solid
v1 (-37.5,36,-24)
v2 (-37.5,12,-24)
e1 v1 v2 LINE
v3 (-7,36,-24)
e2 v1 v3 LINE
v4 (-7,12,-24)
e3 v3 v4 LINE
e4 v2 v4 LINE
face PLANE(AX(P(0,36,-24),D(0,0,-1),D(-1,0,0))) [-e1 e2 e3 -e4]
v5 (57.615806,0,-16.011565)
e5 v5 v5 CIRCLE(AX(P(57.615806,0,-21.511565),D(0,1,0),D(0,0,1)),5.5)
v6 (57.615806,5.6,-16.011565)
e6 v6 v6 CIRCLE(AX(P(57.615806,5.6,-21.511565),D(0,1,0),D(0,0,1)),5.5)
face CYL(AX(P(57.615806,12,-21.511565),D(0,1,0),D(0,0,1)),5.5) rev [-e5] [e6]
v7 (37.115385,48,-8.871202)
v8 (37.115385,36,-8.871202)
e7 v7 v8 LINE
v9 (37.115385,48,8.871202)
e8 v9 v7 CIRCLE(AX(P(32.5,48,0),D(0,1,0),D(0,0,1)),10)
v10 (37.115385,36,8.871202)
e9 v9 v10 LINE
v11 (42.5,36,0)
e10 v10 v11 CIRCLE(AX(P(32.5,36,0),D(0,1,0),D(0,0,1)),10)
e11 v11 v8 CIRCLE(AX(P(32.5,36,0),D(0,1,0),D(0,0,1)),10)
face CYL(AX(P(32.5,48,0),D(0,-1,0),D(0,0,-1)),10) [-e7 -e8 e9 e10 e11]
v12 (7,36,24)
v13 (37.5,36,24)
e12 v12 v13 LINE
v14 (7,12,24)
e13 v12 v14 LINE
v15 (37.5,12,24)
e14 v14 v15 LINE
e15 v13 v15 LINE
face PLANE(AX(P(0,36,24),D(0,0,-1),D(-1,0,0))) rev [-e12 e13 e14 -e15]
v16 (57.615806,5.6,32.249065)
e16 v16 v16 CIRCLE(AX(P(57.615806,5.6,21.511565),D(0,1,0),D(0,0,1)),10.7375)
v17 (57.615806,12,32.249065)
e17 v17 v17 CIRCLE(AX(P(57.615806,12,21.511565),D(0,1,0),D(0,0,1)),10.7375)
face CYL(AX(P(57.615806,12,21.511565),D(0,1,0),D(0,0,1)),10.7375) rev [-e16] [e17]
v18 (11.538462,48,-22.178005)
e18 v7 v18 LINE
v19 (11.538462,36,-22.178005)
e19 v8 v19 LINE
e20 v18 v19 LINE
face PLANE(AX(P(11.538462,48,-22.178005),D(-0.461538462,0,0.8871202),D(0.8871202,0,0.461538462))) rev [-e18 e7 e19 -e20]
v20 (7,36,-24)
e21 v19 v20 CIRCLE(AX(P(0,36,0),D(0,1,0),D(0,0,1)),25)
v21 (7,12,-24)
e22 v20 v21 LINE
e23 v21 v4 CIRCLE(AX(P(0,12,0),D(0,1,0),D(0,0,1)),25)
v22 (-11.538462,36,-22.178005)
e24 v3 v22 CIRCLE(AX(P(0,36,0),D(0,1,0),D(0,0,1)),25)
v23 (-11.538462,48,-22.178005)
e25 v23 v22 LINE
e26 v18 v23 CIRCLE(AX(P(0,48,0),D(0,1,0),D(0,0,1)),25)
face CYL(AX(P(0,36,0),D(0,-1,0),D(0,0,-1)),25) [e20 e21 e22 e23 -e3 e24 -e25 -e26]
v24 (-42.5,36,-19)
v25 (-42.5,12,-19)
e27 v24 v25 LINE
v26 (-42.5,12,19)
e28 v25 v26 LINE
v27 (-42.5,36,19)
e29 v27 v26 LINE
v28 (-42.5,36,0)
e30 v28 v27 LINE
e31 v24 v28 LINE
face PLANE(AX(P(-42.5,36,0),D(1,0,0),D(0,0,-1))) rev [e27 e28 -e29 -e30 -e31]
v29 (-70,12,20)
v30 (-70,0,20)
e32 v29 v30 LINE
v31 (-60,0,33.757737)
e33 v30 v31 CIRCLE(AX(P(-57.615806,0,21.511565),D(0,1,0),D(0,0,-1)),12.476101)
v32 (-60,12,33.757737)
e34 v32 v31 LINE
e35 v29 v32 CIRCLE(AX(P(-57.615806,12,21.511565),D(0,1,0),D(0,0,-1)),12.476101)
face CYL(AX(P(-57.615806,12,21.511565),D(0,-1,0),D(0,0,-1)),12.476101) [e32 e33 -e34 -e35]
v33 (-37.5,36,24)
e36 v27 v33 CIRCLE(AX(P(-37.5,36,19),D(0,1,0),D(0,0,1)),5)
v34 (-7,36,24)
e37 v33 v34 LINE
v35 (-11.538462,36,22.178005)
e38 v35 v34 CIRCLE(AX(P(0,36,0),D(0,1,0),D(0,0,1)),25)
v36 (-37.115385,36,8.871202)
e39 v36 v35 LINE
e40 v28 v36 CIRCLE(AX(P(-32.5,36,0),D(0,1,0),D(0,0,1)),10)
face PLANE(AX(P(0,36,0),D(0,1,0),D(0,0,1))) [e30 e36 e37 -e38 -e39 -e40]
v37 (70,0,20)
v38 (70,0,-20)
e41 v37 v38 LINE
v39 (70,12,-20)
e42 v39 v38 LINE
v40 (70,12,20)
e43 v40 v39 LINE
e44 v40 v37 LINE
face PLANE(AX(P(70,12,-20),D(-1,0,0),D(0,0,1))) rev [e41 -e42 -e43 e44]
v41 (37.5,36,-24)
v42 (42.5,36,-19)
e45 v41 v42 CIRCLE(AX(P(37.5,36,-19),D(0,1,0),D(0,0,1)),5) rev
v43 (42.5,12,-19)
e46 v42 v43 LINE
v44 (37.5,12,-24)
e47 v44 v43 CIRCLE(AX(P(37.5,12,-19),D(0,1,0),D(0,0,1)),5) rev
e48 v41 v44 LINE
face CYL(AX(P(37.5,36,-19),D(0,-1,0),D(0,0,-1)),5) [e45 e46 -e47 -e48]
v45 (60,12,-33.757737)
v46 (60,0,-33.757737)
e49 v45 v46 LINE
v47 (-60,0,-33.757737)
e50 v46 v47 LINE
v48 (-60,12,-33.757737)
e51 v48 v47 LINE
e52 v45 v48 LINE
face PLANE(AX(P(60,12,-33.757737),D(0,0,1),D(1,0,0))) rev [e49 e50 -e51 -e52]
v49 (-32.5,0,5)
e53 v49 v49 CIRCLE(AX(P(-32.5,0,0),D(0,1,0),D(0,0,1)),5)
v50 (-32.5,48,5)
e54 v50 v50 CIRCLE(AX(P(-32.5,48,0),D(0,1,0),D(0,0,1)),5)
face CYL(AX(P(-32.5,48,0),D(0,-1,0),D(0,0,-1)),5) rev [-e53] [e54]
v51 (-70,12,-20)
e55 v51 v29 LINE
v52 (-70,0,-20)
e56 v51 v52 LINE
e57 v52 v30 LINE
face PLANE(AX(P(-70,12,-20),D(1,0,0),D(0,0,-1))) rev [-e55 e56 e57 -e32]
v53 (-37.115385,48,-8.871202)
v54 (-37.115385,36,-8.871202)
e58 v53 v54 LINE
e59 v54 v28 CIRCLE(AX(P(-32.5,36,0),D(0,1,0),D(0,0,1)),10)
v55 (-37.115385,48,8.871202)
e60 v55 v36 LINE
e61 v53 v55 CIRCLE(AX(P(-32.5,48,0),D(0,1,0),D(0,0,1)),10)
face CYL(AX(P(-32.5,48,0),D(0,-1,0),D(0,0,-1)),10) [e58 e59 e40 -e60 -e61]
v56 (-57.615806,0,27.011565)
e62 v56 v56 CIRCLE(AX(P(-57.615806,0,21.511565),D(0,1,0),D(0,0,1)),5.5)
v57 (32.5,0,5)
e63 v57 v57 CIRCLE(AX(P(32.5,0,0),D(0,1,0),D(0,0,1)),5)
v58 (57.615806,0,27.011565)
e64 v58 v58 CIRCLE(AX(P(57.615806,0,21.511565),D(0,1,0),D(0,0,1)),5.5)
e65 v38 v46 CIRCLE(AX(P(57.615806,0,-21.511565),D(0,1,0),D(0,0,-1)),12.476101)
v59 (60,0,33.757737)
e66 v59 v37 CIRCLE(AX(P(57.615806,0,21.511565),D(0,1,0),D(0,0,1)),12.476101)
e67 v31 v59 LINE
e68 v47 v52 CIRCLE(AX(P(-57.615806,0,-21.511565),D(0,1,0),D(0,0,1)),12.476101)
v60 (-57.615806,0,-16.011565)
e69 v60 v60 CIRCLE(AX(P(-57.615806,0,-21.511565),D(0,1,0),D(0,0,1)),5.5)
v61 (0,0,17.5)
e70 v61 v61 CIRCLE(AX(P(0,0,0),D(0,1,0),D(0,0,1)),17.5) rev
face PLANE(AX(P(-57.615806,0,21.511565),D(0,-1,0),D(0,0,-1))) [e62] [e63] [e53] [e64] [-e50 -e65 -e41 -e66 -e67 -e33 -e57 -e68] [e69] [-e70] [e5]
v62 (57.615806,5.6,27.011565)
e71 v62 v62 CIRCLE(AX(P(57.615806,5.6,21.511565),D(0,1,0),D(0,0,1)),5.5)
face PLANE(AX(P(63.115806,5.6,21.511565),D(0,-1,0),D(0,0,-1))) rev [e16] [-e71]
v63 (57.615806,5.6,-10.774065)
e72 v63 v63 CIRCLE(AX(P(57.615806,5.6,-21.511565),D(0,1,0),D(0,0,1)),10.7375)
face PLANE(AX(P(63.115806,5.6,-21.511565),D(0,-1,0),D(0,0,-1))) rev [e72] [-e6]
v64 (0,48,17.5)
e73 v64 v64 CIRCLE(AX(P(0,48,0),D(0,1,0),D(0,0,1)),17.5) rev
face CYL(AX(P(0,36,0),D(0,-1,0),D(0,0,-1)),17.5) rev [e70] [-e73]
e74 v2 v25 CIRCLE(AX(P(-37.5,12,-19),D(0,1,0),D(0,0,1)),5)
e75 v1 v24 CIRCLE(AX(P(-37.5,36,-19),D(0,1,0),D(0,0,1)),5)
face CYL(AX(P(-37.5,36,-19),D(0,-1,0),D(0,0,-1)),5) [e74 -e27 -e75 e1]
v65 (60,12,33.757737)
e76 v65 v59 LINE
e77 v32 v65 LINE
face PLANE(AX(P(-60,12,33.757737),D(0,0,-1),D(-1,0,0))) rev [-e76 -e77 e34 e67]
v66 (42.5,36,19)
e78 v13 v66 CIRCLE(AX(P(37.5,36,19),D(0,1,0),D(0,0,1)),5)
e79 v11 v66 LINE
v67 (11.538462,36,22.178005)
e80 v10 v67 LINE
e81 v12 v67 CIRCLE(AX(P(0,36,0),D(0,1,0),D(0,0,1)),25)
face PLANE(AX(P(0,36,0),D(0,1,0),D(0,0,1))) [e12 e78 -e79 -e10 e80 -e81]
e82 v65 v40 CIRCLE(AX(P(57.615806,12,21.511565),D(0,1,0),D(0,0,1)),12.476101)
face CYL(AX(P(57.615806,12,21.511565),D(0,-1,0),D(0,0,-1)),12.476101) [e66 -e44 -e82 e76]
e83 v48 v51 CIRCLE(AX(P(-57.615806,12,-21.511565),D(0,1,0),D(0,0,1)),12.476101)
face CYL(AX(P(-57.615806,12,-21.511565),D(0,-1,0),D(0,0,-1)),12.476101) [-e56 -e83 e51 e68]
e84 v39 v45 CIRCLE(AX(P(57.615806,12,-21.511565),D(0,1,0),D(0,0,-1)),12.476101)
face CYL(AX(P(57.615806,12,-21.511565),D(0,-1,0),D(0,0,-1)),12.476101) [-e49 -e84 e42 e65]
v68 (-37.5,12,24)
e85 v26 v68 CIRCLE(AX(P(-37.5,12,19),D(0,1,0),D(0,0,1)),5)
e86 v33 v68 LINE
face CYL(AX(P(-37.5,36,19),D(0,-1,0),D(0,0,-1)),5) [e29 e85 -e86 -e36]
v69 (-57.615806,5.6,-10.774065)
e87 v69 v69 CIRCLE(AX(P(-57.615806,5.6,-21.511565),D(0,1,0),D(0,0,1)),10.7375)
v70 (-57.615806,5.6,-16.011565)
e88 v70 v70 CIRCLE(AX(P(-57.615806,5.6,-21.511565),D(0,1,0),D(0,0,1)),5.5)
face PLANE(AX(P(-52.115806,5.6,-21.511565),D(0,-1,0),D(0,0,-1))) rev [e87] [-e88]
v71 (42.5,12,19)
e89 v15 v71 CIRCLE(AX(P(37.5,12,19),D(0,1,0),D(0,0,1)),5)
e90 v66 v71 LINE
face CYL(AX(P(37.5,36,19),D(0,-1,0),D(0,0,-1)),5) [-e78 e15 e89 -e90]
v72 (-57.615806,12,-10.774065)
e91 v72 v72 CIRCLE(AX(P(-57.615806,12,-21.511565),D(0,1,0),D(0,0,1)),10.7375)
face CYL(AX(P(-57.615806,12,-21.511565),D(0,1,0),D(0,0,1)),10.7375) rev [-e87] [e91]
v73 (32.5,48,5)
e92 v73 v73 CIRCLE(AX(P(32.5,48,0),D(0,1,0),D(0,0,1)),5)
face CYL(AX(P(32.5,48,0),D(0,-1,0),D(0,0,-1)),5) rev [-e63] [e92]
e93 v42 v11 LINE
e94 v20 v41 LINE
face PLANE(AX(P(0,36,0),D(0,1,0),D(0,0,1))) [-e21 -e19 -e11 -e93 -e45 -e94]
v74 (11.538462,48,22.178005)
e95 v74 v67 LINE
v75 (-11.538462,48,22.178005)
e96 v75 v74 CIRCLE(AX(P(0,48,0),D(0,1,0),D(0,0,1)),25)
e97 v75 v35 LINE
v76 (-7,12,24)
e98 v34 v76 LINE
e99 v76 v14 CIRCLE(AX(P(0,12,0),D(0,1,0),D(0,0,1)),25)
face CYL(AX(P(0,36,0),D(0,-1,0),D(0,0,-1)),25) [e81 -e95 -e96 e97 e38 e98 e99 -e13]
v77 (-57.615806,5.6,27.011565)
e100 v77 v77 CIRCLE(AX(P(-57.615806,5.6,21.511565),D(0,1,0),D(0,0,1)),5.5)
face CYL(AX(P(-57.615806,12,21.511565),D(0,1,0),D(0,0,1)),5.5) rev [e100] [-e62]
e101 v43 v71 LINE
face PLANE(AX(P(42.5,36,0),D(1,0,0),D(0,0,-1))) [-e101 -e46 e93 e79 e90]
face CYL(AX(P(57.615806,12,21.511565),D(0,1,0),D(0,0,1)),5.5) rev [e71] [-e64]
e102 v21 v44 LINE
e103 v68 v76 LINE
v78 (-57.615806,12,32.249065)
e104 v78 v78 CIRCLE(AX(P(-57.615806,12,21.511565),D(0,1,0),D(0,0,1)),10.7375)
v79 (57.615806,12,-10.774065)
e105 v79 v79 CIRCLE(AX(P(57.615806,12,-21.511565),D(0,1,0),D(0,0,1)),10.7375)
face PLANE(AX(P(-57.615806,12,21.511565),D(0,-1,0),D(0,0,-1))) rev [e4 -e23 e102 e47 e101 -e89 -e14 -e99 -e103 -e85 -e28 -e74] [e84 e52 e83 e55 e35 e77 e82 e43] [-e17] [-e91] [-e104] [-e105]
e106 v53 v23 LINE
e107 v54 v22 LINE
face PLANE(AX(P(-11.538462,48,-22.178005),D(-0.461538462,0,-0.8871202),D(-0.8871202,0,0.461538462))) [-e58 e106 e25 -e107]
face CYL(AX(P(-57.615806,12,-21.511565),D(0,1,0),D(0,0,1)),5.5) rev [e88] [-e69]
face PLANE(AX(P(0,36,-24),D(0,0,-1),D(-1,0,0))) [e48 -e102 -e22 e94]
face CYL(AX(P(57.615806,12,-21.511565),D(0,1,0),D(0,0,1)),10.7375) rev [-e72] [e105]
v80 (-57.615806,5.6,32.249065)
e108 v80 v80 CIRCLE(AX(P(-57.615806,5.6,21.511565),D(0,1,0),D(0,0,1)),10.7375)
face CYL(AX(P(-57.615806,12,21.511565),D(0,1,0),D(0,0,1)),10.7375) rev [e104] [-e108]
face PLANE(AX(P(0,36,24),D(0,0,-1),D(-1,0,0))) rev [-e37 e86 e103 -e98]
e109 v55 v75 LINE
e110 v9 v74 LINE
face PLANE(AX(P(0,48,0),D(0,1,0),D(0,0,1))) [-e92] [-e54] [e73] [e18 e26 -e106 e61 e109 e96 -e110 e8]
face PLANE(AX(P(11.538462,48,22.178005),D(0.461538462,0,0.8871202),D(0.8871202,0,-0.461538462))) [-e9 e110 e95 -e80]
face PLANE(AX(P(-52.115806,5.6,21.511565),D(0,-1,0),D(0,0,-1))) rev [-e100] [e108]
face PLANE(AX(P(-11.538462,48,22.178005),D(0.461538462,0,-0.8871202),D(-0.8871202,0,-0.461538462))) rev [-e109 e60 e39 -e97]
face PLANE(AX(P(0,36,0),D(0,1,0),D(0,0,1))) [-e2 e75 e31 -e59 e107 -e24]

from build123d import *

# Parameters (mm, degrees)
BOSS_EXTRUDE1_DEPTH                           = 12
CBORE_FOR_M10_HEX_HEAD_CAP_SCREW1_D           = 11
CBORE_FOR_M10_HEX_HEAD_CAP_SCREW1_CBORE_D     = 21.475
CBORE_FOR_M10_HEX_HEAD_CAP_SCREW1_CBORE_DEPTH = 6.4
SKETCH4_R                                     = 17.5
BOSS_EXTRUDE3_DEPTH                           = 24
SKETCH7_R                                     = 5
SKETCH7_R_2                                   = 17.5
BOSS_EXTRUDE4_DEPTH                           = 12
SKETCH8_R                                     = 17.5
SKETCH8_R_2                                   = 5
CUT_EXTRUDE2_DEPTH                            = 92.413676108


with BuildPart() as part:
    # Sketch1 → Boss-Extrude1 (new body)
    with BuildSketch(Plane(origin=(0, 0, 0), x_dir=(1, 0, 0), z_dir=(0, 1, 0))):
        with BuildLine():
            Line((-60, -33.757736606), (60, -33.757736606))
            ThreePointArc((60, -33.757736606), (67.707641844, -28.846955004), (70, -20))
            Line((70, -20), (70, 20))
            ThreePointArc((70, 20), (67.707641844, 28.846955004), (60, 33.757736606))
            Line((60, 33.757736606), (-60, 33.757736606))
            ThreePointArc((-60, 33.757736606), (-67.707641844, 28.846955004), (-70, 20))
            Line((-70, 20), (-70, -20))
            ThreePointArc((-70, -20), (-67.707641844, -28.846955004), (-60, -33.757736606))
        make_face()
    extrude(amount=BOSS_EXTRUDE1_DEPTH)

    # CBORE for M10 Hex Head Cap Screw1 (through all)
    with Locations(Plane(origin=(-57.615806102, 12, -21.511565447), x_dir=(0, 0, 1), z_dir=(0, 1, 0))):
        with Locations((0, 0), (43.023130894, 0), (43.023130894, 115.231612204), (0, 115.231612204)):
            CounterBoreHole(CBORE_FOR_M10_HEX_HEAD_CAP_SCREW1_D / 2, CBORE_FOR_M10_HEX_HEAD_CAP_SCREW1_CBORE_D / 2, CBORE_FOR_M10_HEX_HEAD_CAP_SCREW1_CBORE_DEPTH)

    # Sketch4 → Boss-Extrude3 (add)
    with BuildSketch(Plane(origin=(0, 12, 0), x_dir=(1, 0, 0), z_dir=(0, 1, 0))):
        with BuildLine():
            Line((-7, 24), (-37.5, 24))
            ThreePointArc((-37.5, 24), (-41.035533906, 22.535533906), (-42.5, 19))
            Line((-42.5, 19), (-42.5, -19))
            ThreePointArc((-42.5, -19), (-41.035533906, -22.535533906), (-37.5, -24))
            Line((-37.5, -24), (-7, -24))
            ThreePointArc((-7, -24), (0, -25), (7, -24))
            Line((7, -24), (37.5, -24))
            ThreePointArc((37.5, -24), (41.035533906, -22.535533906), (42.5, -19))
            Line((42.5, -19), (42.5, 19))
            ThreePointArc((42.5, 19), (41.035533906, 22.535533906), (37.5, 24))
            Line((37.5, 24), (7, 24))
            ThreePointArc((7, 24), (0, 25), (-7, 24))
        make_face()
        Circle(SKETCH4_R, mode=Mode.SUBTRACT)
    extrude(amount=BOSS_EXTRUDE3_DEPTH)

    # Sketch7 → Boss-Extrude4 (add)
    with BuildSketch(Plane(origin=(0, 36, 0), x_dir=(1, 0, 0), z_dir=(0, 1, 0))):
        with BuildLine():
            ThreePointArc((37.115384615, -8.871201996), (42.5, 0), (37.115384615, 8.871201996))
            Line((37.115384615, 8.871201996), (11.538461538, 22.17800499))
            ThreePointArc((11.538461538, 22.17800499), (0, 25), (-11.538461538, 22.17800499))
            Line((-11.538461538, 22.17800499), (-37.115384615, 8.871201996))
            ThreePointArc((-37.115384615, 8.871201996), (-42.5, 0), (-37.115384615, -8.871201996))
            Line((-37.115384615, -8.871201996), (-11.538461538, -22.17800499))
            ThreePointArc((-11.538461538, -22.17800499), (0, -25), (11.538461538, -22.17800499))
            Line((11.538461538, -22.17800499), (37.115384615, -8.871201996))
        make_face()
        with Locations((32.5, 0)):
            Circle(SKETCH7_R, mode=Mode.SUBTRACT)
        Circle(SKETCH7_R_2, mode=Mode.SUBTRACT)
        with Locations((-32.5, 0)):
            Circle(SKETCH7_R, mode=Mode.SUBTRACT)
    extrude(amount=BOSS_EXTRUDE4_DEPTH)

    # Sketch8 → Cut-Extrude2 (cut, through all)
    with BuildSketch(Plane(origin=(0, 48, 0), x_dir=(1, 0, 0), z_dir=(0, 1, 0))):
        Circle(SKETCH8_R)
        with Locations((32.5, 0)):
            Circle(SKETCH8_R_2)
        with Locations((-32.5, 0)):
            Circle(SKETCH8_R_2)
    extrude(amount=-CUT_EXTRUDE2_DEPTH, mode=Mode.SUBTRACT)


solid = part.part
